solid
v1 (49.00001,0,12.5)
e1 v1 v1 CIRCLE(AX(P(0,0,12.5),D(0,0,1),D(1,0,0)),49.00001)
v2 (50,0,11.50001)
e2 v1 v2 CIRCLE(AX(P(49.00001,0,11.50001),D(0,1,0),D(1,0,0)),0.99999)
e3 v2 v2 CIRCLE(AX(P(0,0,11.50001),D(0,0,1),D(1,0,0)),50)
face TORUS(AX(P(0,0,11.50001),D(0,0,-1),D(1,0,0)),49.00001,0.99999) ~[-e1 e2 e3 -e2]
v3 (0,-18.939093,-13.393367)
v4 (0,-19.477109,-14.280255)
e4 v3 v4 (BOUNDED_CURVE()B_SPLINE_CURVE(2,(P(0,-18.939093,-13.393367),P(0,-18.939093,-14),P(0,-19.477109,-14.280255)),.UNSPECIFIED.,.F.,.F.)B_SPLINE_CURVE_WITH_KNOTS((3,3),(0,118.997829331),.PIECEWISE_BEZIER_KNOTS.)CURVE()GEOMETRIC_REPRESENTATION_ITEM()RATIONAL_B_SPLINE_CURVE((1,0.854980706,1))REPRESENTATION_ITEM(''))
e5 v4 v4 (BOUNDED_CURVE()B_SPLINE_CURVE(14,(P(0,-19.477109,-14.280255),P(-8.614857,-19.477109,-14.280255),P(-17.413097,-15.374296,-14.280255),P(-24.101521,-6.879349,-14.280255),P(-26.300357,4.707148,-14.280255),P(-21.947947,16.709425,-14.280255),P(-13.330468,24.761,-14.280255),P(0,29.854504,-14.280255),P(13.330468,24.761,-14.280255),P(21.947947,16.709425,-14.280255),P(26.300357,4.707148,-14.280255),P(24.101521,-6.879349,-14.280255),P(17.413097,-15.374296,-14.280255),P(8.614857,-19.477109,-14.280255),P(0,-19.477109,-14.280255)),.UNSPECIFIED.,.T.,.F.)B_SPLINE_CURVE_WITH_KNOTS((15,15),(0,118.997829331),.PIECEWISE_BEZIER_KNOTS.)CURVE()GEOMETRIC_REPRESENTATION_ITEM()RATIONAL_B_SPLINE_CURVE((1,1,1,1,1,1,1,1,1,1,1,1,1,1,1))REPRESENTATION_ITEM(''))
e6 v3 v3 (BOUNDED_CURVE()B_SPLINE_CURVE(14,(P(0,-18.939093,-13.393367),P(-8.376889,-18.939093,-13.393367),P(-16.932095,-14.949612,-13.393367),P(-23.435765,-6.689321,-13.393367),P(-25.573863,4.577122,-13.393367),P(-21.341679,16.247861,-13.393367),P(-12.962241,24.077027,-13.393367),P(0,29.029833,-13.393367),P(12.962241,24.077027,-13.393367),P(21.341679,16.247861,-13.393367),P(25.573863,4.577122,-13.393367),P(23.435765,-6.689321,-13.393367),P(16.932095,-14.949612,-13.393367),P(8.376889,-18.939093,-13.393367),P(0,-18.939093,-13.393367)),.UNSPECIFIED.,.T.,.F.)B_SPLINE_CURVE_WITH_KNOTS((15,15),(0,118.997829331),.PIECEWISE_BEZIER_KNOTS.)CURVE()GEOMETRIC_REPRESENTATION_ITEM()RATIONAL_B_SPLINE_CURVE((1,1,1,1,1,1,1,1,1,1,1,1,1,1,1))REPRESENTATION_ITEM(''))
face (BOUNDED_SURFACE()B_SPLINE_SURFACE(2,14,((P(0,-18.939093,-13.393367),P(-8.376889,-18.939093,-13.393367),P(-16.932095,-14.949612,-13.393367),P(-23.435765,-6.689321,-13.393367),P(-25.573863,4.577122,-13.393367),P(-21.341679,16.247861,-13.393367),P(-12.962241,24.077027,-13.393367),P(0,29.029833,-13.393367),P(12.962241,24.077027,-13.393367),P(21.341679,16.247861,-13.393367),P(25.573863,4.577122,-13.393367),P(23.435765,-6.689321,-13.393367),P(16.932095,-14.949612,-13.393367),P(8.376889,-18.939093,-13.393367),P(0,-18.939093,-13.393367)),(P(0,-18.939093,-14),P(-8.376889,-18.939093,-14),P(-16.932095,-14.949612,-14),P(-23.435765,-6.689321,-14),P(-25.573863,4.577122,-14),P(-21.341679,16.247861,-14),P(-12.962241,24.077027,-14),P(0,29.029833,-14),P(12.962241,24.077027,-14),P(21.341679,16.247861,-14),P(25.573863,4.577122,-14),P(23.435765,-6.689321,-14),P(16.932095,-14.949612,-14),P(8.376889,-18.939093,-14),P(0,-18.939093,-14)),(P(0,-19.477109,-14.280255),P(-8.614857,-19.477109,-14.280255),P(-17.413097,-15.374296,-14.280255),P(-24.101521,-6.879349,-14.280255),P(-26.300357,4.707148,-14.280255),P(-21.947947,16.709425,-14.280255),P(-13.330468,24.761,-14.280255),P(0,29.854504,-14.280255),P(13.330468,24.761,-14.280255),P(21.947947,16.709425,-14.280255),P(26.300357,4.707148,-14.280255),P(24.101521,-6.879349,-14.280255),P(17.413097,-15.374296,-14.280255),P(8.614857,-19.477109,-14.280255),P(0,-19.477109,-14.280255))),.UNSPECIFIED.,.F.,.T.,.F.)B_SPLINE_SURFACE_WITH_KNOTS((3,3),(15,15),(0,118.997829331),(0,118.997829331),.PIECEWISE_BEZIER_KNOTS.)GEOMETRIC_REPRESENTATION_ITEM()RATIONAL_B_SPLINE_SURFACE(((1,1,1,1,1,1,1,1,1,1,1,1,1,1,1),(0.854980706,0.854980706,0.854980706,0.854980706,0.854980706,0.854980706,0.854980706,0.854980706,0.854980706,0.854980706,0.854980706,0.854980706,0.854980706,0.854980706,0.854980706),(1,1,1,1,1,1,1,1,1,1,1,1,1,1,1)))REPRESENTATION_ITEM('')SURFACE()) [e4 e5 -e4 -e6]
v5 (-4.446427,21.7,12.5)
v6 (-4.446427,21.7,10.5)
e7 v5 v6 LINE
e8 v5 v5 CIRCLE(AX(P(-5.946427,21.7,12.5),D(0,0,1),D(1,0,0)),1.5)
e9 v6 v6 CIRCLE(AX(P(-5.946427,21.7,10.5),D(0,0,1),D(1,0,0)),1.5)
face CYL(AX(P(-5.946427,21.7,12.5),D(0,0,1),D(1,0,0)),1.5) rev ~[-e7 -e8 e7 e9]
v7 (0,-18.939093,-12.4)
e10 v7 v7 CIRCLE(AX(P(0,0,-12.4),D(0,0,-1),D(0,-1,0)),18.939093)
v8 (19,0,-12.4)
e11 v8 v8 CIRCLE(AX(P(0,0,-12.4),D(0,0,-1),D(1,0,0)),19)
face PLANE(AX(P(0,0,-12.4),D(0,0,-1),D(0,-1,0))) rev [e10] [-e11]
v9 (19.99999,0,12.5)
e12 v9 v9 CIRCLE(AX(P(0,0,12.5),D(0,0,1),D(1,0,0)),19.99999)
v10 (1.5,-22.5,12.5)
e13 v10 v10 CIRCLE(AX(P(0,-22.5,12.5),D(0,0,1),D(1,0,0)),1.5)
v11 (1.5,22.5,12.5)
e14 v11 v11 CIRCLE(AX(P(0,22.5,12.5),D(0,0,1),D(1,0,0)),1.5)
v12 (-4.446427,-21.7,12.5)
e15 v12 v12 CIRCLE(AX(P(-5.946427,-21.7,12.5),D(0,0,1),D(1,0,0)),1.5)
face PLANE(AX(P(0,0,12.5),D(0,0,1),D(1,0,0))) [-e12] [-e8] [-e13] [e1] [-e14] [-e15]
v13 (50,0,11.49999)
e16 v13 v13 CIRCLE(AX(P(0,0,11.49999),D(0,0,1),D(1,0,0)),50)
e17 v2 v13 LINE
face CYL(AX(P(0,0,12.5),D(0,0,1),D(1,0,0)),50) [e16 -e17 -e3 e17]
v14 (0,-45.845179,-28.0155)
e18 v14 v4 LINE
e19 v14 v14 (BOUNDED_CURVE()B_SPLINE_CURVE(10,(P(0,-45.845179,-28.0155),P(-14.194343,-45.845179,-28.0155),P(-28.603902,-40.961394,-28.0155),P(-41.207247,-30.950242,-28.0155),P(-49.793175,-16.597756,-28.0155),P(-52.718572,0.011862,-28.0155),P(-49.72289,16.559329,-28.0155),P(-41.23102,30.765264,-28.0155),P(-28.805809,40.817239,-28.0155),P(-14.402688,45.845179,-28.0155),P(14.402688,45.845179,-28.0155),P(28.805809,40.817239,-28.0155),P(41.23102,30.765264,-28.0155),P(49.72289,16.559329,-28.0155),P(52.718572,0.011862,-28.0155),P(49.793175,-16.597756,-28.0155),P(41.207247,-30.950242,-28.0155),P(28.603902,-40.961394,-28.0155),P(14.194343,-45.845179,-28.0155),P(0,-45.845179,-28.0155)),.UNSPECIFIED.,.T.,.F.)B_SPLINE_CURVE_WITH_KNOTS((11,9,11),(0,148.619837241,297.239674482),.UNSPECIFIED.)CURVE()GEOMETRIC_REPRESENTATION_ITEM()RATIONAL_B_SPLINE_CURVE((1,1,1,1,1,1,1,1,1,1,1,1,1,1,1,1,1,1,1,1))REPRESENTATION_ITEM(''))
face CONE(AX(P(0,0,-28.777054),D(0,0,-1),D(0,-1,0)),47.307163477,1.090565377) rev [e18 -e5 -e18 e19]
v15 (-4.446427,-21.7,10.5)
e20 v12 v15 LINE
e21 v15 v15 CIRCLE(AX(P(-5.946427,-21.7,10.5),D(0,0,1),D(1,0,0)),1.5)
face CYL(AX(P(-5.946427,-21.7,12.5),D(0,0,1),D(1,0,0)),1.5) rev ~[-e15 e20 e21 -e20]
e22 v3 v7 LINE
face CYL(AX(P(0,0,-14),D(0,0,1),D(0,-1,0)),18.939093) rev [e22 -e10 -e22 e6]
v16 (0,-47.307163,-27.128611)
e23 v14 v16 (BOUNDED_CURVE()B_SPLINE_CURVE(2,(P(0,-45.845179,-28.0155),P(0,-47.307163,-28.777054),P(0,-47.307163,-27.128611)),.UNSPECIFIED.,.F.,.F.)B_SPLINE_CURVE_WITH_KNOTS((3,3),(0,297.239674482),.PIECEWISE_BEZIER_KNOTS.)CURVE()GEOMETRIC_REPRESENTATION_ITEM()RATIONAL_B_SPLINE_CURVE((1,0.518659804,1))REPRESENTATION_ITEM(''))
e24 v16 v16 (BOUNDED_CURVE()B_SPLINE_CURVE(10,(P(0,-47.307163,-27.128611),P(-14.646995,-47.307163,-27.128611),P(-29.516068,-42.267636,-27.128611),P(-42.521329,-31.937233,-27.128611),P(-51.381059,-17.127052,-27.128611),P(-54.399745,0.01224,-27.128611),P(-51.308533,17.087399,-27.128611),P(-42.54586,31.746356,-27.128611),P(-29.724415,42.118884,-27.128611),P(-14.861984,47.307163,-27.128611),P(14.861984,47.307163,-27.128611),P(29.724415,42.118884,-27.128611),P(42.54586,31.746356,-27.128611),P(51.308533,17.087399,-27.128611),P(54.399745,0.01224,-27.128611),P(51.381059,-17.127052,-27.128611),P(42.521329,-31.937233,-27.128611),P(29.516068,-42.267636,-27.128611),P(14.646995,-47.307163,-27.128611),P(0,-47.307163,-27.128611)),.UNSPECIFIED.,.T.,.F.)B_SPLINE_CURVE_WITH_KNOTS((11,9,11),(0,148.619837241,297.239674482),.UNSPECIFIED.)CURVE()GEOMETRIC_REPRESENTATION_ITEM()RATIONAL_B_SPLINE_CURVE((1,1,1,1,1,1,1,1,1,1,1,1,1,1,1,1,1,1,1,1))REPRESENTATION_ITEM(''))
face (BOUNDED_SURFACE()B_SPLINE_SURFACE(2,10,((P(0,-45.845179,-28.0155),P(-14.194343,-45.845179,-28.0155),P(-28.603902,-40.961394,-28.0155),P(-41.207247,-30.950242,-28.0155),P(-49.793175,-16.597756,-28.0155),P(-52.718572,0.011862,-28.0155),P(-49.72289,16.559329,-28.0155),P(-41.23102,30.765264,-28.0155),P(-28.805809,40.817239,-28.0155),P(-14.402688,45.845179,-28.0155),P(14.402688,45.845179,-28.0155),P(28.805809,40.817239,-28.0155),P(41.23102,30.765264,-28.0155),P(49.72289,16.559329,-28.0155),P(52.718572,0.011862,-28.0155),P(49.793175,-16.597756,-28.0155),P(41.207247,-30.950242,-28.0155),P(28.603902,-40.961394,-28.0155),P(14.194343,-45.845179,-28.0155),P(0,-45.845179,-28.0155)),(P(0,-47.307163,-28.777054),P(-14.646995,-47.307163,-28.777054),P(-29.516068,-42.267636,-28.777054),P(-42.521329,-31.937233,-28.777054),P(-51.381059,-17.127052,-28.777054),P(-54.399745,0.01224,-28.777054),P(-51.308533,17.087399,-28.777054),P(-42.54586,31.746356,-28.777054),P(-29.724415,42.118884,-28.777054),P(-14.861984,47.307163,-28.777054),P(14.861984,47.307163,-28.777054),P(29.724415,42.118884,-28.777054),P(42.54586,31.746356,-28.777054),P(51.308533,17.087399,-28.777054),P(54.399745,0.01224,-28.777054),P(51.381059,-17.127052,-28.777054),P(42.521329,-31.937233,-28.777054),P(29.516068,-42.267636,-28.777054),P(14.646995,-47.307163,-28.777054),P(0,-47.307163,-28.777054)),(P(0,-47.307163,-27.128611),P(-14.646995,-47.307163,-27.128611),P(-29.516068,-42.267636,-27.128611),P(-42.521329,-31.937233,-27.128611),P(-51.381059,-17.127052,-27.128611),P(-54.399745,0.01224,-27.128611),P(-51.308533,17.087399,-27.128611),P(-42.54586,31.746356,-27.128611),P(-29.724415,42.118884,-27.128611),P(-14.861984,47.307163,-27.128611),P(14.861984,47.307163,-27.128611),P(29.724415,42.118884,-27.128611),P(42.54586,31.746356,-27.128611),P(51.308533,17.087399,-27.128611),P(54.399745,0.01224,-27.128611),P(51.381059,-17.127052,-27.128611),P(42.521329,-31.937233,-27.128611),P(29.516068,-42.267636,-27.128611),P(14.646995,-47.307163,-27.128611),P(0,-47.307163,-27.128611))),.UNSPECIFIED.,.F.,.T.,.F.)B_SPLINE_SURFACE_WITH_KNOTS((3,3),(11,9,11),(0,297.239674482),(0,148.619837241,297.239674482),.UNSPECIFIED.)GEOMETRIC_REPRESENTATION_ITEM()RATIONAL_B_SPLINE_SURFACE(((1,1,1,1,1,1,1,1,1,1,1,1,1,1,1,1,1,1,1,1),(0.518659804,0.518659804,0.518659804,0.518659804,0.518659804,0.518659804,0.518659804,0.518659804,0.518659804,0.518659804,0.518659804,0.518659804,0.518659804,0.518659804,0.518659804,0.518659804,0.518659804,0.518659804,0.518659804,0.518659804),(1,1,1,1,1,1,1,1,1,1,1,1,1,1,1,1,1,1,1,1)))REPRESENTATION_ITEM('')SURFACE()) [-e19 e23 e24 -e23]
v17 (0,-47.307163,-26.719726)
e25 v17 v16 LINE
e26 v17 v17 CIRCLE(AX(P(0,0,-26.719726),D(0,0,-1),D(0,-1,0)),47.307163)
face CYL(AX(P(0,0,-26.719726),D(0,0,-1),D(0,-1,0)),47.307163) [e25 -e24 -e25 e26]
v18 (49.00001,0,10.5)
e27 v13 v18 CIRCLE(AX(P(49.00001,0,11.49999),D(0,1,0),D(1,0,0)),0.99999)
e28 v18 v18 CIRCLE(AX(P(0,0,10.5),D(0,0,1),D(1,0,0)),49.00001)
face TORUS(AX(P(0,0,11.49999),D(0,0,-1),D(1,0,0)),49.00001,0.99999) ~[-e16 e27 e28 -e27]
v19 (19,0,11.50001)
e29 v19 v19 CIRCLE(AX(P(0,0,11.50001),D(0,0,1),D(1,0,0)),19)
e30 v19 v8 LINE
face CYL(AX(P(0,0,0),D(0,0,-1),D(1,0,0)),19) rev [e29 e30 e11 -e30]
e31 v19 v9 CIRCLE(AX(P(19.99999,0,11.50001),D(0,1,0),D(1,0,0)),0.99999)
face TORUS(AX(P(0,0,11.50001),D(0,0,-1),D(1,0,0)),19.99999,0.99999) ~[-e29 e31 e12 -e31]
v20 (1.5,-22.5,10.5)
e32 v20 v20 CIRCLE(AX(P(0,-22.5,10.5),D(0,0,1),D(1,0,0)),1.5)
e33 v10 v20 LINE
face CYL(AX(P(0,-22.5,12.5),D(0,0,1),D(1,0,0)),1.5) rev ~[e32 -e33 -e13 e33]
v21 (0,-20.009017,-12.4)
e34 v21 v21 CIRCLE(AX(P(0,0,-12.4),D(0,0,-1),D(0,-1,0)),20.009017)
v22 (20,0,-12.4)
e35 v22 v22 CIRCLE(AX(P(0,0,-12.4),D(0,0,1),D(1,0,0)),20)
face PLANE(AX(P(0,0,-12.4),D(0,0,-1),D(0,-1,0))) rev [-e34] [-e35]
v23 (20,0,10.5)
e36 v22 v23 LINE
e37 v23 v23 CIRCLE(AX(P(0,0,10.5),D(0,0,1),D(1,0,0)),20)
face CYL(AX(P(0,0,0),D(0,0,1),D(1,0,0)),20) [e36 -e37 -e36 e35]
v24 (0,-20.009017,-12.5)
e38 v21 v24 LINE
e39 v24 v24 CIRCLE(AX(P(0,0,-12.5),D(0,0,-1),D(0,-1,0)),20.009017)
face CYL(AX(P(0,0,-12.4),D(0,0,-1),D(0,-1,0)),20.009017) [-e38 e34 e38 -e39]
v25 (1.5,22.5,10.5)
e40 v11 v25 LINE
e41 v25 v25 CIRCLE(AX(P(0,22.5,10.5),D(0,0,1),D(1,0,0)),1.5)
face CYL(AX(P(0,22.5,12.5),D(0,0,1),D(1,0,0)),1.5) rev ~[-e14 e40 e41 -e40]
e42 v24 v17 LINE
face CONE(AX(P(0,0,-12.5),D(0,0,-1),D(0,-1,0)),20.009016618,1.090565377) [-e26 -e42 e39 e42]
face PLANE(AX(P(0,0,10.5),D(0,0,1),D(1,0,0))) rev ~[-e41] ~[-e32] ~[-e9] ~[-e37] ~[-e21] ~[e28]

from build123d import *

# Parameters (mm, degrees)
F0_R     = 20
F0_R_2   = 19
F1_DEPTH = 12.5
F2_R     = 50
F2_R_2   = 1.5
F2_R_3   = 20
F3_DEPTH = 2
F6_R     = 0.99999
F7_R     = 1


# Not quite as in the source:
# - a fillet or chamfer is up to 0.001 mm smaller than in the source, because OpenCascade refuses the exact size


with BuildPart() as f1:
    # F0 (on Top) → F1 (new body, symmetric)
    with BuildSketch(Plane.XY):
        Circle(F0_R)
        Circle(F0_R_2, mode=Mode.SUBTRACT)
    extrude(amount=F1_DEPTH, both=True)

    # F2 (on face) → F3 (join)
    with BuildSketch(Plane.XY.offset(12.5)):
        Circle(F2_R)
        with Locations((-5.9464274989, -21.7)):
            Circle(F2_R_2, mode=Mode.SUBTRACT)
        with Locations((0, -22.5)):
            Circle(F2_R_2, mode=Mode.SUBTRACT)
        with Locations((-5.9464274989, 21.7)):
            Circle(F2_R_2, mode=Mode.SUBTRACT)
        Circle(F2_R_3, mode=Mode.SUBTRACT)
        with Locations((0, 22.5)):
            Circle(F2_R_2, mode=Mode.SUBTRACT)
    extrude(amount=-F3_DEPTH)

    # F4 (on Right) → F5 (revolve)
    with BuildSketch(Plane.YZ):
        Polygon((-18.9390927553, -14), (-18.9390927553, -12.5), (-18.9390927553, -12.4), (-20.0090166181, -12.4), (-20.0090166181, -12.5), (-47.3071634769, -26.7197255045), (-47.3071634769, -28.7770535795), align=None)
    revolve(axis=Axis((0, 0, -0.6562490016), (0, 0, -1)))

    # F6 (radius 1 in the source; OpenCascade refuses exactly that, so slightly less here)
    f6_edges = [f1.edges().sort_by_distance(p)[0] for p in [
        (-19, 0, 12.5),
        (-50, 0, 12.5),
        (-50, 0, 10.5),
    ]]
    fillet(f6_edges, radius=F6_R)

    # F7
    f7_edges = [f1.edges().sort_by_distance(p)[0] for p in [
        (0, 47.307163, -28.777054),
        (0, 18.939093, -14),
    ]]
    fillet(f7_edges, radius=F7_R)


solid = f1.part
